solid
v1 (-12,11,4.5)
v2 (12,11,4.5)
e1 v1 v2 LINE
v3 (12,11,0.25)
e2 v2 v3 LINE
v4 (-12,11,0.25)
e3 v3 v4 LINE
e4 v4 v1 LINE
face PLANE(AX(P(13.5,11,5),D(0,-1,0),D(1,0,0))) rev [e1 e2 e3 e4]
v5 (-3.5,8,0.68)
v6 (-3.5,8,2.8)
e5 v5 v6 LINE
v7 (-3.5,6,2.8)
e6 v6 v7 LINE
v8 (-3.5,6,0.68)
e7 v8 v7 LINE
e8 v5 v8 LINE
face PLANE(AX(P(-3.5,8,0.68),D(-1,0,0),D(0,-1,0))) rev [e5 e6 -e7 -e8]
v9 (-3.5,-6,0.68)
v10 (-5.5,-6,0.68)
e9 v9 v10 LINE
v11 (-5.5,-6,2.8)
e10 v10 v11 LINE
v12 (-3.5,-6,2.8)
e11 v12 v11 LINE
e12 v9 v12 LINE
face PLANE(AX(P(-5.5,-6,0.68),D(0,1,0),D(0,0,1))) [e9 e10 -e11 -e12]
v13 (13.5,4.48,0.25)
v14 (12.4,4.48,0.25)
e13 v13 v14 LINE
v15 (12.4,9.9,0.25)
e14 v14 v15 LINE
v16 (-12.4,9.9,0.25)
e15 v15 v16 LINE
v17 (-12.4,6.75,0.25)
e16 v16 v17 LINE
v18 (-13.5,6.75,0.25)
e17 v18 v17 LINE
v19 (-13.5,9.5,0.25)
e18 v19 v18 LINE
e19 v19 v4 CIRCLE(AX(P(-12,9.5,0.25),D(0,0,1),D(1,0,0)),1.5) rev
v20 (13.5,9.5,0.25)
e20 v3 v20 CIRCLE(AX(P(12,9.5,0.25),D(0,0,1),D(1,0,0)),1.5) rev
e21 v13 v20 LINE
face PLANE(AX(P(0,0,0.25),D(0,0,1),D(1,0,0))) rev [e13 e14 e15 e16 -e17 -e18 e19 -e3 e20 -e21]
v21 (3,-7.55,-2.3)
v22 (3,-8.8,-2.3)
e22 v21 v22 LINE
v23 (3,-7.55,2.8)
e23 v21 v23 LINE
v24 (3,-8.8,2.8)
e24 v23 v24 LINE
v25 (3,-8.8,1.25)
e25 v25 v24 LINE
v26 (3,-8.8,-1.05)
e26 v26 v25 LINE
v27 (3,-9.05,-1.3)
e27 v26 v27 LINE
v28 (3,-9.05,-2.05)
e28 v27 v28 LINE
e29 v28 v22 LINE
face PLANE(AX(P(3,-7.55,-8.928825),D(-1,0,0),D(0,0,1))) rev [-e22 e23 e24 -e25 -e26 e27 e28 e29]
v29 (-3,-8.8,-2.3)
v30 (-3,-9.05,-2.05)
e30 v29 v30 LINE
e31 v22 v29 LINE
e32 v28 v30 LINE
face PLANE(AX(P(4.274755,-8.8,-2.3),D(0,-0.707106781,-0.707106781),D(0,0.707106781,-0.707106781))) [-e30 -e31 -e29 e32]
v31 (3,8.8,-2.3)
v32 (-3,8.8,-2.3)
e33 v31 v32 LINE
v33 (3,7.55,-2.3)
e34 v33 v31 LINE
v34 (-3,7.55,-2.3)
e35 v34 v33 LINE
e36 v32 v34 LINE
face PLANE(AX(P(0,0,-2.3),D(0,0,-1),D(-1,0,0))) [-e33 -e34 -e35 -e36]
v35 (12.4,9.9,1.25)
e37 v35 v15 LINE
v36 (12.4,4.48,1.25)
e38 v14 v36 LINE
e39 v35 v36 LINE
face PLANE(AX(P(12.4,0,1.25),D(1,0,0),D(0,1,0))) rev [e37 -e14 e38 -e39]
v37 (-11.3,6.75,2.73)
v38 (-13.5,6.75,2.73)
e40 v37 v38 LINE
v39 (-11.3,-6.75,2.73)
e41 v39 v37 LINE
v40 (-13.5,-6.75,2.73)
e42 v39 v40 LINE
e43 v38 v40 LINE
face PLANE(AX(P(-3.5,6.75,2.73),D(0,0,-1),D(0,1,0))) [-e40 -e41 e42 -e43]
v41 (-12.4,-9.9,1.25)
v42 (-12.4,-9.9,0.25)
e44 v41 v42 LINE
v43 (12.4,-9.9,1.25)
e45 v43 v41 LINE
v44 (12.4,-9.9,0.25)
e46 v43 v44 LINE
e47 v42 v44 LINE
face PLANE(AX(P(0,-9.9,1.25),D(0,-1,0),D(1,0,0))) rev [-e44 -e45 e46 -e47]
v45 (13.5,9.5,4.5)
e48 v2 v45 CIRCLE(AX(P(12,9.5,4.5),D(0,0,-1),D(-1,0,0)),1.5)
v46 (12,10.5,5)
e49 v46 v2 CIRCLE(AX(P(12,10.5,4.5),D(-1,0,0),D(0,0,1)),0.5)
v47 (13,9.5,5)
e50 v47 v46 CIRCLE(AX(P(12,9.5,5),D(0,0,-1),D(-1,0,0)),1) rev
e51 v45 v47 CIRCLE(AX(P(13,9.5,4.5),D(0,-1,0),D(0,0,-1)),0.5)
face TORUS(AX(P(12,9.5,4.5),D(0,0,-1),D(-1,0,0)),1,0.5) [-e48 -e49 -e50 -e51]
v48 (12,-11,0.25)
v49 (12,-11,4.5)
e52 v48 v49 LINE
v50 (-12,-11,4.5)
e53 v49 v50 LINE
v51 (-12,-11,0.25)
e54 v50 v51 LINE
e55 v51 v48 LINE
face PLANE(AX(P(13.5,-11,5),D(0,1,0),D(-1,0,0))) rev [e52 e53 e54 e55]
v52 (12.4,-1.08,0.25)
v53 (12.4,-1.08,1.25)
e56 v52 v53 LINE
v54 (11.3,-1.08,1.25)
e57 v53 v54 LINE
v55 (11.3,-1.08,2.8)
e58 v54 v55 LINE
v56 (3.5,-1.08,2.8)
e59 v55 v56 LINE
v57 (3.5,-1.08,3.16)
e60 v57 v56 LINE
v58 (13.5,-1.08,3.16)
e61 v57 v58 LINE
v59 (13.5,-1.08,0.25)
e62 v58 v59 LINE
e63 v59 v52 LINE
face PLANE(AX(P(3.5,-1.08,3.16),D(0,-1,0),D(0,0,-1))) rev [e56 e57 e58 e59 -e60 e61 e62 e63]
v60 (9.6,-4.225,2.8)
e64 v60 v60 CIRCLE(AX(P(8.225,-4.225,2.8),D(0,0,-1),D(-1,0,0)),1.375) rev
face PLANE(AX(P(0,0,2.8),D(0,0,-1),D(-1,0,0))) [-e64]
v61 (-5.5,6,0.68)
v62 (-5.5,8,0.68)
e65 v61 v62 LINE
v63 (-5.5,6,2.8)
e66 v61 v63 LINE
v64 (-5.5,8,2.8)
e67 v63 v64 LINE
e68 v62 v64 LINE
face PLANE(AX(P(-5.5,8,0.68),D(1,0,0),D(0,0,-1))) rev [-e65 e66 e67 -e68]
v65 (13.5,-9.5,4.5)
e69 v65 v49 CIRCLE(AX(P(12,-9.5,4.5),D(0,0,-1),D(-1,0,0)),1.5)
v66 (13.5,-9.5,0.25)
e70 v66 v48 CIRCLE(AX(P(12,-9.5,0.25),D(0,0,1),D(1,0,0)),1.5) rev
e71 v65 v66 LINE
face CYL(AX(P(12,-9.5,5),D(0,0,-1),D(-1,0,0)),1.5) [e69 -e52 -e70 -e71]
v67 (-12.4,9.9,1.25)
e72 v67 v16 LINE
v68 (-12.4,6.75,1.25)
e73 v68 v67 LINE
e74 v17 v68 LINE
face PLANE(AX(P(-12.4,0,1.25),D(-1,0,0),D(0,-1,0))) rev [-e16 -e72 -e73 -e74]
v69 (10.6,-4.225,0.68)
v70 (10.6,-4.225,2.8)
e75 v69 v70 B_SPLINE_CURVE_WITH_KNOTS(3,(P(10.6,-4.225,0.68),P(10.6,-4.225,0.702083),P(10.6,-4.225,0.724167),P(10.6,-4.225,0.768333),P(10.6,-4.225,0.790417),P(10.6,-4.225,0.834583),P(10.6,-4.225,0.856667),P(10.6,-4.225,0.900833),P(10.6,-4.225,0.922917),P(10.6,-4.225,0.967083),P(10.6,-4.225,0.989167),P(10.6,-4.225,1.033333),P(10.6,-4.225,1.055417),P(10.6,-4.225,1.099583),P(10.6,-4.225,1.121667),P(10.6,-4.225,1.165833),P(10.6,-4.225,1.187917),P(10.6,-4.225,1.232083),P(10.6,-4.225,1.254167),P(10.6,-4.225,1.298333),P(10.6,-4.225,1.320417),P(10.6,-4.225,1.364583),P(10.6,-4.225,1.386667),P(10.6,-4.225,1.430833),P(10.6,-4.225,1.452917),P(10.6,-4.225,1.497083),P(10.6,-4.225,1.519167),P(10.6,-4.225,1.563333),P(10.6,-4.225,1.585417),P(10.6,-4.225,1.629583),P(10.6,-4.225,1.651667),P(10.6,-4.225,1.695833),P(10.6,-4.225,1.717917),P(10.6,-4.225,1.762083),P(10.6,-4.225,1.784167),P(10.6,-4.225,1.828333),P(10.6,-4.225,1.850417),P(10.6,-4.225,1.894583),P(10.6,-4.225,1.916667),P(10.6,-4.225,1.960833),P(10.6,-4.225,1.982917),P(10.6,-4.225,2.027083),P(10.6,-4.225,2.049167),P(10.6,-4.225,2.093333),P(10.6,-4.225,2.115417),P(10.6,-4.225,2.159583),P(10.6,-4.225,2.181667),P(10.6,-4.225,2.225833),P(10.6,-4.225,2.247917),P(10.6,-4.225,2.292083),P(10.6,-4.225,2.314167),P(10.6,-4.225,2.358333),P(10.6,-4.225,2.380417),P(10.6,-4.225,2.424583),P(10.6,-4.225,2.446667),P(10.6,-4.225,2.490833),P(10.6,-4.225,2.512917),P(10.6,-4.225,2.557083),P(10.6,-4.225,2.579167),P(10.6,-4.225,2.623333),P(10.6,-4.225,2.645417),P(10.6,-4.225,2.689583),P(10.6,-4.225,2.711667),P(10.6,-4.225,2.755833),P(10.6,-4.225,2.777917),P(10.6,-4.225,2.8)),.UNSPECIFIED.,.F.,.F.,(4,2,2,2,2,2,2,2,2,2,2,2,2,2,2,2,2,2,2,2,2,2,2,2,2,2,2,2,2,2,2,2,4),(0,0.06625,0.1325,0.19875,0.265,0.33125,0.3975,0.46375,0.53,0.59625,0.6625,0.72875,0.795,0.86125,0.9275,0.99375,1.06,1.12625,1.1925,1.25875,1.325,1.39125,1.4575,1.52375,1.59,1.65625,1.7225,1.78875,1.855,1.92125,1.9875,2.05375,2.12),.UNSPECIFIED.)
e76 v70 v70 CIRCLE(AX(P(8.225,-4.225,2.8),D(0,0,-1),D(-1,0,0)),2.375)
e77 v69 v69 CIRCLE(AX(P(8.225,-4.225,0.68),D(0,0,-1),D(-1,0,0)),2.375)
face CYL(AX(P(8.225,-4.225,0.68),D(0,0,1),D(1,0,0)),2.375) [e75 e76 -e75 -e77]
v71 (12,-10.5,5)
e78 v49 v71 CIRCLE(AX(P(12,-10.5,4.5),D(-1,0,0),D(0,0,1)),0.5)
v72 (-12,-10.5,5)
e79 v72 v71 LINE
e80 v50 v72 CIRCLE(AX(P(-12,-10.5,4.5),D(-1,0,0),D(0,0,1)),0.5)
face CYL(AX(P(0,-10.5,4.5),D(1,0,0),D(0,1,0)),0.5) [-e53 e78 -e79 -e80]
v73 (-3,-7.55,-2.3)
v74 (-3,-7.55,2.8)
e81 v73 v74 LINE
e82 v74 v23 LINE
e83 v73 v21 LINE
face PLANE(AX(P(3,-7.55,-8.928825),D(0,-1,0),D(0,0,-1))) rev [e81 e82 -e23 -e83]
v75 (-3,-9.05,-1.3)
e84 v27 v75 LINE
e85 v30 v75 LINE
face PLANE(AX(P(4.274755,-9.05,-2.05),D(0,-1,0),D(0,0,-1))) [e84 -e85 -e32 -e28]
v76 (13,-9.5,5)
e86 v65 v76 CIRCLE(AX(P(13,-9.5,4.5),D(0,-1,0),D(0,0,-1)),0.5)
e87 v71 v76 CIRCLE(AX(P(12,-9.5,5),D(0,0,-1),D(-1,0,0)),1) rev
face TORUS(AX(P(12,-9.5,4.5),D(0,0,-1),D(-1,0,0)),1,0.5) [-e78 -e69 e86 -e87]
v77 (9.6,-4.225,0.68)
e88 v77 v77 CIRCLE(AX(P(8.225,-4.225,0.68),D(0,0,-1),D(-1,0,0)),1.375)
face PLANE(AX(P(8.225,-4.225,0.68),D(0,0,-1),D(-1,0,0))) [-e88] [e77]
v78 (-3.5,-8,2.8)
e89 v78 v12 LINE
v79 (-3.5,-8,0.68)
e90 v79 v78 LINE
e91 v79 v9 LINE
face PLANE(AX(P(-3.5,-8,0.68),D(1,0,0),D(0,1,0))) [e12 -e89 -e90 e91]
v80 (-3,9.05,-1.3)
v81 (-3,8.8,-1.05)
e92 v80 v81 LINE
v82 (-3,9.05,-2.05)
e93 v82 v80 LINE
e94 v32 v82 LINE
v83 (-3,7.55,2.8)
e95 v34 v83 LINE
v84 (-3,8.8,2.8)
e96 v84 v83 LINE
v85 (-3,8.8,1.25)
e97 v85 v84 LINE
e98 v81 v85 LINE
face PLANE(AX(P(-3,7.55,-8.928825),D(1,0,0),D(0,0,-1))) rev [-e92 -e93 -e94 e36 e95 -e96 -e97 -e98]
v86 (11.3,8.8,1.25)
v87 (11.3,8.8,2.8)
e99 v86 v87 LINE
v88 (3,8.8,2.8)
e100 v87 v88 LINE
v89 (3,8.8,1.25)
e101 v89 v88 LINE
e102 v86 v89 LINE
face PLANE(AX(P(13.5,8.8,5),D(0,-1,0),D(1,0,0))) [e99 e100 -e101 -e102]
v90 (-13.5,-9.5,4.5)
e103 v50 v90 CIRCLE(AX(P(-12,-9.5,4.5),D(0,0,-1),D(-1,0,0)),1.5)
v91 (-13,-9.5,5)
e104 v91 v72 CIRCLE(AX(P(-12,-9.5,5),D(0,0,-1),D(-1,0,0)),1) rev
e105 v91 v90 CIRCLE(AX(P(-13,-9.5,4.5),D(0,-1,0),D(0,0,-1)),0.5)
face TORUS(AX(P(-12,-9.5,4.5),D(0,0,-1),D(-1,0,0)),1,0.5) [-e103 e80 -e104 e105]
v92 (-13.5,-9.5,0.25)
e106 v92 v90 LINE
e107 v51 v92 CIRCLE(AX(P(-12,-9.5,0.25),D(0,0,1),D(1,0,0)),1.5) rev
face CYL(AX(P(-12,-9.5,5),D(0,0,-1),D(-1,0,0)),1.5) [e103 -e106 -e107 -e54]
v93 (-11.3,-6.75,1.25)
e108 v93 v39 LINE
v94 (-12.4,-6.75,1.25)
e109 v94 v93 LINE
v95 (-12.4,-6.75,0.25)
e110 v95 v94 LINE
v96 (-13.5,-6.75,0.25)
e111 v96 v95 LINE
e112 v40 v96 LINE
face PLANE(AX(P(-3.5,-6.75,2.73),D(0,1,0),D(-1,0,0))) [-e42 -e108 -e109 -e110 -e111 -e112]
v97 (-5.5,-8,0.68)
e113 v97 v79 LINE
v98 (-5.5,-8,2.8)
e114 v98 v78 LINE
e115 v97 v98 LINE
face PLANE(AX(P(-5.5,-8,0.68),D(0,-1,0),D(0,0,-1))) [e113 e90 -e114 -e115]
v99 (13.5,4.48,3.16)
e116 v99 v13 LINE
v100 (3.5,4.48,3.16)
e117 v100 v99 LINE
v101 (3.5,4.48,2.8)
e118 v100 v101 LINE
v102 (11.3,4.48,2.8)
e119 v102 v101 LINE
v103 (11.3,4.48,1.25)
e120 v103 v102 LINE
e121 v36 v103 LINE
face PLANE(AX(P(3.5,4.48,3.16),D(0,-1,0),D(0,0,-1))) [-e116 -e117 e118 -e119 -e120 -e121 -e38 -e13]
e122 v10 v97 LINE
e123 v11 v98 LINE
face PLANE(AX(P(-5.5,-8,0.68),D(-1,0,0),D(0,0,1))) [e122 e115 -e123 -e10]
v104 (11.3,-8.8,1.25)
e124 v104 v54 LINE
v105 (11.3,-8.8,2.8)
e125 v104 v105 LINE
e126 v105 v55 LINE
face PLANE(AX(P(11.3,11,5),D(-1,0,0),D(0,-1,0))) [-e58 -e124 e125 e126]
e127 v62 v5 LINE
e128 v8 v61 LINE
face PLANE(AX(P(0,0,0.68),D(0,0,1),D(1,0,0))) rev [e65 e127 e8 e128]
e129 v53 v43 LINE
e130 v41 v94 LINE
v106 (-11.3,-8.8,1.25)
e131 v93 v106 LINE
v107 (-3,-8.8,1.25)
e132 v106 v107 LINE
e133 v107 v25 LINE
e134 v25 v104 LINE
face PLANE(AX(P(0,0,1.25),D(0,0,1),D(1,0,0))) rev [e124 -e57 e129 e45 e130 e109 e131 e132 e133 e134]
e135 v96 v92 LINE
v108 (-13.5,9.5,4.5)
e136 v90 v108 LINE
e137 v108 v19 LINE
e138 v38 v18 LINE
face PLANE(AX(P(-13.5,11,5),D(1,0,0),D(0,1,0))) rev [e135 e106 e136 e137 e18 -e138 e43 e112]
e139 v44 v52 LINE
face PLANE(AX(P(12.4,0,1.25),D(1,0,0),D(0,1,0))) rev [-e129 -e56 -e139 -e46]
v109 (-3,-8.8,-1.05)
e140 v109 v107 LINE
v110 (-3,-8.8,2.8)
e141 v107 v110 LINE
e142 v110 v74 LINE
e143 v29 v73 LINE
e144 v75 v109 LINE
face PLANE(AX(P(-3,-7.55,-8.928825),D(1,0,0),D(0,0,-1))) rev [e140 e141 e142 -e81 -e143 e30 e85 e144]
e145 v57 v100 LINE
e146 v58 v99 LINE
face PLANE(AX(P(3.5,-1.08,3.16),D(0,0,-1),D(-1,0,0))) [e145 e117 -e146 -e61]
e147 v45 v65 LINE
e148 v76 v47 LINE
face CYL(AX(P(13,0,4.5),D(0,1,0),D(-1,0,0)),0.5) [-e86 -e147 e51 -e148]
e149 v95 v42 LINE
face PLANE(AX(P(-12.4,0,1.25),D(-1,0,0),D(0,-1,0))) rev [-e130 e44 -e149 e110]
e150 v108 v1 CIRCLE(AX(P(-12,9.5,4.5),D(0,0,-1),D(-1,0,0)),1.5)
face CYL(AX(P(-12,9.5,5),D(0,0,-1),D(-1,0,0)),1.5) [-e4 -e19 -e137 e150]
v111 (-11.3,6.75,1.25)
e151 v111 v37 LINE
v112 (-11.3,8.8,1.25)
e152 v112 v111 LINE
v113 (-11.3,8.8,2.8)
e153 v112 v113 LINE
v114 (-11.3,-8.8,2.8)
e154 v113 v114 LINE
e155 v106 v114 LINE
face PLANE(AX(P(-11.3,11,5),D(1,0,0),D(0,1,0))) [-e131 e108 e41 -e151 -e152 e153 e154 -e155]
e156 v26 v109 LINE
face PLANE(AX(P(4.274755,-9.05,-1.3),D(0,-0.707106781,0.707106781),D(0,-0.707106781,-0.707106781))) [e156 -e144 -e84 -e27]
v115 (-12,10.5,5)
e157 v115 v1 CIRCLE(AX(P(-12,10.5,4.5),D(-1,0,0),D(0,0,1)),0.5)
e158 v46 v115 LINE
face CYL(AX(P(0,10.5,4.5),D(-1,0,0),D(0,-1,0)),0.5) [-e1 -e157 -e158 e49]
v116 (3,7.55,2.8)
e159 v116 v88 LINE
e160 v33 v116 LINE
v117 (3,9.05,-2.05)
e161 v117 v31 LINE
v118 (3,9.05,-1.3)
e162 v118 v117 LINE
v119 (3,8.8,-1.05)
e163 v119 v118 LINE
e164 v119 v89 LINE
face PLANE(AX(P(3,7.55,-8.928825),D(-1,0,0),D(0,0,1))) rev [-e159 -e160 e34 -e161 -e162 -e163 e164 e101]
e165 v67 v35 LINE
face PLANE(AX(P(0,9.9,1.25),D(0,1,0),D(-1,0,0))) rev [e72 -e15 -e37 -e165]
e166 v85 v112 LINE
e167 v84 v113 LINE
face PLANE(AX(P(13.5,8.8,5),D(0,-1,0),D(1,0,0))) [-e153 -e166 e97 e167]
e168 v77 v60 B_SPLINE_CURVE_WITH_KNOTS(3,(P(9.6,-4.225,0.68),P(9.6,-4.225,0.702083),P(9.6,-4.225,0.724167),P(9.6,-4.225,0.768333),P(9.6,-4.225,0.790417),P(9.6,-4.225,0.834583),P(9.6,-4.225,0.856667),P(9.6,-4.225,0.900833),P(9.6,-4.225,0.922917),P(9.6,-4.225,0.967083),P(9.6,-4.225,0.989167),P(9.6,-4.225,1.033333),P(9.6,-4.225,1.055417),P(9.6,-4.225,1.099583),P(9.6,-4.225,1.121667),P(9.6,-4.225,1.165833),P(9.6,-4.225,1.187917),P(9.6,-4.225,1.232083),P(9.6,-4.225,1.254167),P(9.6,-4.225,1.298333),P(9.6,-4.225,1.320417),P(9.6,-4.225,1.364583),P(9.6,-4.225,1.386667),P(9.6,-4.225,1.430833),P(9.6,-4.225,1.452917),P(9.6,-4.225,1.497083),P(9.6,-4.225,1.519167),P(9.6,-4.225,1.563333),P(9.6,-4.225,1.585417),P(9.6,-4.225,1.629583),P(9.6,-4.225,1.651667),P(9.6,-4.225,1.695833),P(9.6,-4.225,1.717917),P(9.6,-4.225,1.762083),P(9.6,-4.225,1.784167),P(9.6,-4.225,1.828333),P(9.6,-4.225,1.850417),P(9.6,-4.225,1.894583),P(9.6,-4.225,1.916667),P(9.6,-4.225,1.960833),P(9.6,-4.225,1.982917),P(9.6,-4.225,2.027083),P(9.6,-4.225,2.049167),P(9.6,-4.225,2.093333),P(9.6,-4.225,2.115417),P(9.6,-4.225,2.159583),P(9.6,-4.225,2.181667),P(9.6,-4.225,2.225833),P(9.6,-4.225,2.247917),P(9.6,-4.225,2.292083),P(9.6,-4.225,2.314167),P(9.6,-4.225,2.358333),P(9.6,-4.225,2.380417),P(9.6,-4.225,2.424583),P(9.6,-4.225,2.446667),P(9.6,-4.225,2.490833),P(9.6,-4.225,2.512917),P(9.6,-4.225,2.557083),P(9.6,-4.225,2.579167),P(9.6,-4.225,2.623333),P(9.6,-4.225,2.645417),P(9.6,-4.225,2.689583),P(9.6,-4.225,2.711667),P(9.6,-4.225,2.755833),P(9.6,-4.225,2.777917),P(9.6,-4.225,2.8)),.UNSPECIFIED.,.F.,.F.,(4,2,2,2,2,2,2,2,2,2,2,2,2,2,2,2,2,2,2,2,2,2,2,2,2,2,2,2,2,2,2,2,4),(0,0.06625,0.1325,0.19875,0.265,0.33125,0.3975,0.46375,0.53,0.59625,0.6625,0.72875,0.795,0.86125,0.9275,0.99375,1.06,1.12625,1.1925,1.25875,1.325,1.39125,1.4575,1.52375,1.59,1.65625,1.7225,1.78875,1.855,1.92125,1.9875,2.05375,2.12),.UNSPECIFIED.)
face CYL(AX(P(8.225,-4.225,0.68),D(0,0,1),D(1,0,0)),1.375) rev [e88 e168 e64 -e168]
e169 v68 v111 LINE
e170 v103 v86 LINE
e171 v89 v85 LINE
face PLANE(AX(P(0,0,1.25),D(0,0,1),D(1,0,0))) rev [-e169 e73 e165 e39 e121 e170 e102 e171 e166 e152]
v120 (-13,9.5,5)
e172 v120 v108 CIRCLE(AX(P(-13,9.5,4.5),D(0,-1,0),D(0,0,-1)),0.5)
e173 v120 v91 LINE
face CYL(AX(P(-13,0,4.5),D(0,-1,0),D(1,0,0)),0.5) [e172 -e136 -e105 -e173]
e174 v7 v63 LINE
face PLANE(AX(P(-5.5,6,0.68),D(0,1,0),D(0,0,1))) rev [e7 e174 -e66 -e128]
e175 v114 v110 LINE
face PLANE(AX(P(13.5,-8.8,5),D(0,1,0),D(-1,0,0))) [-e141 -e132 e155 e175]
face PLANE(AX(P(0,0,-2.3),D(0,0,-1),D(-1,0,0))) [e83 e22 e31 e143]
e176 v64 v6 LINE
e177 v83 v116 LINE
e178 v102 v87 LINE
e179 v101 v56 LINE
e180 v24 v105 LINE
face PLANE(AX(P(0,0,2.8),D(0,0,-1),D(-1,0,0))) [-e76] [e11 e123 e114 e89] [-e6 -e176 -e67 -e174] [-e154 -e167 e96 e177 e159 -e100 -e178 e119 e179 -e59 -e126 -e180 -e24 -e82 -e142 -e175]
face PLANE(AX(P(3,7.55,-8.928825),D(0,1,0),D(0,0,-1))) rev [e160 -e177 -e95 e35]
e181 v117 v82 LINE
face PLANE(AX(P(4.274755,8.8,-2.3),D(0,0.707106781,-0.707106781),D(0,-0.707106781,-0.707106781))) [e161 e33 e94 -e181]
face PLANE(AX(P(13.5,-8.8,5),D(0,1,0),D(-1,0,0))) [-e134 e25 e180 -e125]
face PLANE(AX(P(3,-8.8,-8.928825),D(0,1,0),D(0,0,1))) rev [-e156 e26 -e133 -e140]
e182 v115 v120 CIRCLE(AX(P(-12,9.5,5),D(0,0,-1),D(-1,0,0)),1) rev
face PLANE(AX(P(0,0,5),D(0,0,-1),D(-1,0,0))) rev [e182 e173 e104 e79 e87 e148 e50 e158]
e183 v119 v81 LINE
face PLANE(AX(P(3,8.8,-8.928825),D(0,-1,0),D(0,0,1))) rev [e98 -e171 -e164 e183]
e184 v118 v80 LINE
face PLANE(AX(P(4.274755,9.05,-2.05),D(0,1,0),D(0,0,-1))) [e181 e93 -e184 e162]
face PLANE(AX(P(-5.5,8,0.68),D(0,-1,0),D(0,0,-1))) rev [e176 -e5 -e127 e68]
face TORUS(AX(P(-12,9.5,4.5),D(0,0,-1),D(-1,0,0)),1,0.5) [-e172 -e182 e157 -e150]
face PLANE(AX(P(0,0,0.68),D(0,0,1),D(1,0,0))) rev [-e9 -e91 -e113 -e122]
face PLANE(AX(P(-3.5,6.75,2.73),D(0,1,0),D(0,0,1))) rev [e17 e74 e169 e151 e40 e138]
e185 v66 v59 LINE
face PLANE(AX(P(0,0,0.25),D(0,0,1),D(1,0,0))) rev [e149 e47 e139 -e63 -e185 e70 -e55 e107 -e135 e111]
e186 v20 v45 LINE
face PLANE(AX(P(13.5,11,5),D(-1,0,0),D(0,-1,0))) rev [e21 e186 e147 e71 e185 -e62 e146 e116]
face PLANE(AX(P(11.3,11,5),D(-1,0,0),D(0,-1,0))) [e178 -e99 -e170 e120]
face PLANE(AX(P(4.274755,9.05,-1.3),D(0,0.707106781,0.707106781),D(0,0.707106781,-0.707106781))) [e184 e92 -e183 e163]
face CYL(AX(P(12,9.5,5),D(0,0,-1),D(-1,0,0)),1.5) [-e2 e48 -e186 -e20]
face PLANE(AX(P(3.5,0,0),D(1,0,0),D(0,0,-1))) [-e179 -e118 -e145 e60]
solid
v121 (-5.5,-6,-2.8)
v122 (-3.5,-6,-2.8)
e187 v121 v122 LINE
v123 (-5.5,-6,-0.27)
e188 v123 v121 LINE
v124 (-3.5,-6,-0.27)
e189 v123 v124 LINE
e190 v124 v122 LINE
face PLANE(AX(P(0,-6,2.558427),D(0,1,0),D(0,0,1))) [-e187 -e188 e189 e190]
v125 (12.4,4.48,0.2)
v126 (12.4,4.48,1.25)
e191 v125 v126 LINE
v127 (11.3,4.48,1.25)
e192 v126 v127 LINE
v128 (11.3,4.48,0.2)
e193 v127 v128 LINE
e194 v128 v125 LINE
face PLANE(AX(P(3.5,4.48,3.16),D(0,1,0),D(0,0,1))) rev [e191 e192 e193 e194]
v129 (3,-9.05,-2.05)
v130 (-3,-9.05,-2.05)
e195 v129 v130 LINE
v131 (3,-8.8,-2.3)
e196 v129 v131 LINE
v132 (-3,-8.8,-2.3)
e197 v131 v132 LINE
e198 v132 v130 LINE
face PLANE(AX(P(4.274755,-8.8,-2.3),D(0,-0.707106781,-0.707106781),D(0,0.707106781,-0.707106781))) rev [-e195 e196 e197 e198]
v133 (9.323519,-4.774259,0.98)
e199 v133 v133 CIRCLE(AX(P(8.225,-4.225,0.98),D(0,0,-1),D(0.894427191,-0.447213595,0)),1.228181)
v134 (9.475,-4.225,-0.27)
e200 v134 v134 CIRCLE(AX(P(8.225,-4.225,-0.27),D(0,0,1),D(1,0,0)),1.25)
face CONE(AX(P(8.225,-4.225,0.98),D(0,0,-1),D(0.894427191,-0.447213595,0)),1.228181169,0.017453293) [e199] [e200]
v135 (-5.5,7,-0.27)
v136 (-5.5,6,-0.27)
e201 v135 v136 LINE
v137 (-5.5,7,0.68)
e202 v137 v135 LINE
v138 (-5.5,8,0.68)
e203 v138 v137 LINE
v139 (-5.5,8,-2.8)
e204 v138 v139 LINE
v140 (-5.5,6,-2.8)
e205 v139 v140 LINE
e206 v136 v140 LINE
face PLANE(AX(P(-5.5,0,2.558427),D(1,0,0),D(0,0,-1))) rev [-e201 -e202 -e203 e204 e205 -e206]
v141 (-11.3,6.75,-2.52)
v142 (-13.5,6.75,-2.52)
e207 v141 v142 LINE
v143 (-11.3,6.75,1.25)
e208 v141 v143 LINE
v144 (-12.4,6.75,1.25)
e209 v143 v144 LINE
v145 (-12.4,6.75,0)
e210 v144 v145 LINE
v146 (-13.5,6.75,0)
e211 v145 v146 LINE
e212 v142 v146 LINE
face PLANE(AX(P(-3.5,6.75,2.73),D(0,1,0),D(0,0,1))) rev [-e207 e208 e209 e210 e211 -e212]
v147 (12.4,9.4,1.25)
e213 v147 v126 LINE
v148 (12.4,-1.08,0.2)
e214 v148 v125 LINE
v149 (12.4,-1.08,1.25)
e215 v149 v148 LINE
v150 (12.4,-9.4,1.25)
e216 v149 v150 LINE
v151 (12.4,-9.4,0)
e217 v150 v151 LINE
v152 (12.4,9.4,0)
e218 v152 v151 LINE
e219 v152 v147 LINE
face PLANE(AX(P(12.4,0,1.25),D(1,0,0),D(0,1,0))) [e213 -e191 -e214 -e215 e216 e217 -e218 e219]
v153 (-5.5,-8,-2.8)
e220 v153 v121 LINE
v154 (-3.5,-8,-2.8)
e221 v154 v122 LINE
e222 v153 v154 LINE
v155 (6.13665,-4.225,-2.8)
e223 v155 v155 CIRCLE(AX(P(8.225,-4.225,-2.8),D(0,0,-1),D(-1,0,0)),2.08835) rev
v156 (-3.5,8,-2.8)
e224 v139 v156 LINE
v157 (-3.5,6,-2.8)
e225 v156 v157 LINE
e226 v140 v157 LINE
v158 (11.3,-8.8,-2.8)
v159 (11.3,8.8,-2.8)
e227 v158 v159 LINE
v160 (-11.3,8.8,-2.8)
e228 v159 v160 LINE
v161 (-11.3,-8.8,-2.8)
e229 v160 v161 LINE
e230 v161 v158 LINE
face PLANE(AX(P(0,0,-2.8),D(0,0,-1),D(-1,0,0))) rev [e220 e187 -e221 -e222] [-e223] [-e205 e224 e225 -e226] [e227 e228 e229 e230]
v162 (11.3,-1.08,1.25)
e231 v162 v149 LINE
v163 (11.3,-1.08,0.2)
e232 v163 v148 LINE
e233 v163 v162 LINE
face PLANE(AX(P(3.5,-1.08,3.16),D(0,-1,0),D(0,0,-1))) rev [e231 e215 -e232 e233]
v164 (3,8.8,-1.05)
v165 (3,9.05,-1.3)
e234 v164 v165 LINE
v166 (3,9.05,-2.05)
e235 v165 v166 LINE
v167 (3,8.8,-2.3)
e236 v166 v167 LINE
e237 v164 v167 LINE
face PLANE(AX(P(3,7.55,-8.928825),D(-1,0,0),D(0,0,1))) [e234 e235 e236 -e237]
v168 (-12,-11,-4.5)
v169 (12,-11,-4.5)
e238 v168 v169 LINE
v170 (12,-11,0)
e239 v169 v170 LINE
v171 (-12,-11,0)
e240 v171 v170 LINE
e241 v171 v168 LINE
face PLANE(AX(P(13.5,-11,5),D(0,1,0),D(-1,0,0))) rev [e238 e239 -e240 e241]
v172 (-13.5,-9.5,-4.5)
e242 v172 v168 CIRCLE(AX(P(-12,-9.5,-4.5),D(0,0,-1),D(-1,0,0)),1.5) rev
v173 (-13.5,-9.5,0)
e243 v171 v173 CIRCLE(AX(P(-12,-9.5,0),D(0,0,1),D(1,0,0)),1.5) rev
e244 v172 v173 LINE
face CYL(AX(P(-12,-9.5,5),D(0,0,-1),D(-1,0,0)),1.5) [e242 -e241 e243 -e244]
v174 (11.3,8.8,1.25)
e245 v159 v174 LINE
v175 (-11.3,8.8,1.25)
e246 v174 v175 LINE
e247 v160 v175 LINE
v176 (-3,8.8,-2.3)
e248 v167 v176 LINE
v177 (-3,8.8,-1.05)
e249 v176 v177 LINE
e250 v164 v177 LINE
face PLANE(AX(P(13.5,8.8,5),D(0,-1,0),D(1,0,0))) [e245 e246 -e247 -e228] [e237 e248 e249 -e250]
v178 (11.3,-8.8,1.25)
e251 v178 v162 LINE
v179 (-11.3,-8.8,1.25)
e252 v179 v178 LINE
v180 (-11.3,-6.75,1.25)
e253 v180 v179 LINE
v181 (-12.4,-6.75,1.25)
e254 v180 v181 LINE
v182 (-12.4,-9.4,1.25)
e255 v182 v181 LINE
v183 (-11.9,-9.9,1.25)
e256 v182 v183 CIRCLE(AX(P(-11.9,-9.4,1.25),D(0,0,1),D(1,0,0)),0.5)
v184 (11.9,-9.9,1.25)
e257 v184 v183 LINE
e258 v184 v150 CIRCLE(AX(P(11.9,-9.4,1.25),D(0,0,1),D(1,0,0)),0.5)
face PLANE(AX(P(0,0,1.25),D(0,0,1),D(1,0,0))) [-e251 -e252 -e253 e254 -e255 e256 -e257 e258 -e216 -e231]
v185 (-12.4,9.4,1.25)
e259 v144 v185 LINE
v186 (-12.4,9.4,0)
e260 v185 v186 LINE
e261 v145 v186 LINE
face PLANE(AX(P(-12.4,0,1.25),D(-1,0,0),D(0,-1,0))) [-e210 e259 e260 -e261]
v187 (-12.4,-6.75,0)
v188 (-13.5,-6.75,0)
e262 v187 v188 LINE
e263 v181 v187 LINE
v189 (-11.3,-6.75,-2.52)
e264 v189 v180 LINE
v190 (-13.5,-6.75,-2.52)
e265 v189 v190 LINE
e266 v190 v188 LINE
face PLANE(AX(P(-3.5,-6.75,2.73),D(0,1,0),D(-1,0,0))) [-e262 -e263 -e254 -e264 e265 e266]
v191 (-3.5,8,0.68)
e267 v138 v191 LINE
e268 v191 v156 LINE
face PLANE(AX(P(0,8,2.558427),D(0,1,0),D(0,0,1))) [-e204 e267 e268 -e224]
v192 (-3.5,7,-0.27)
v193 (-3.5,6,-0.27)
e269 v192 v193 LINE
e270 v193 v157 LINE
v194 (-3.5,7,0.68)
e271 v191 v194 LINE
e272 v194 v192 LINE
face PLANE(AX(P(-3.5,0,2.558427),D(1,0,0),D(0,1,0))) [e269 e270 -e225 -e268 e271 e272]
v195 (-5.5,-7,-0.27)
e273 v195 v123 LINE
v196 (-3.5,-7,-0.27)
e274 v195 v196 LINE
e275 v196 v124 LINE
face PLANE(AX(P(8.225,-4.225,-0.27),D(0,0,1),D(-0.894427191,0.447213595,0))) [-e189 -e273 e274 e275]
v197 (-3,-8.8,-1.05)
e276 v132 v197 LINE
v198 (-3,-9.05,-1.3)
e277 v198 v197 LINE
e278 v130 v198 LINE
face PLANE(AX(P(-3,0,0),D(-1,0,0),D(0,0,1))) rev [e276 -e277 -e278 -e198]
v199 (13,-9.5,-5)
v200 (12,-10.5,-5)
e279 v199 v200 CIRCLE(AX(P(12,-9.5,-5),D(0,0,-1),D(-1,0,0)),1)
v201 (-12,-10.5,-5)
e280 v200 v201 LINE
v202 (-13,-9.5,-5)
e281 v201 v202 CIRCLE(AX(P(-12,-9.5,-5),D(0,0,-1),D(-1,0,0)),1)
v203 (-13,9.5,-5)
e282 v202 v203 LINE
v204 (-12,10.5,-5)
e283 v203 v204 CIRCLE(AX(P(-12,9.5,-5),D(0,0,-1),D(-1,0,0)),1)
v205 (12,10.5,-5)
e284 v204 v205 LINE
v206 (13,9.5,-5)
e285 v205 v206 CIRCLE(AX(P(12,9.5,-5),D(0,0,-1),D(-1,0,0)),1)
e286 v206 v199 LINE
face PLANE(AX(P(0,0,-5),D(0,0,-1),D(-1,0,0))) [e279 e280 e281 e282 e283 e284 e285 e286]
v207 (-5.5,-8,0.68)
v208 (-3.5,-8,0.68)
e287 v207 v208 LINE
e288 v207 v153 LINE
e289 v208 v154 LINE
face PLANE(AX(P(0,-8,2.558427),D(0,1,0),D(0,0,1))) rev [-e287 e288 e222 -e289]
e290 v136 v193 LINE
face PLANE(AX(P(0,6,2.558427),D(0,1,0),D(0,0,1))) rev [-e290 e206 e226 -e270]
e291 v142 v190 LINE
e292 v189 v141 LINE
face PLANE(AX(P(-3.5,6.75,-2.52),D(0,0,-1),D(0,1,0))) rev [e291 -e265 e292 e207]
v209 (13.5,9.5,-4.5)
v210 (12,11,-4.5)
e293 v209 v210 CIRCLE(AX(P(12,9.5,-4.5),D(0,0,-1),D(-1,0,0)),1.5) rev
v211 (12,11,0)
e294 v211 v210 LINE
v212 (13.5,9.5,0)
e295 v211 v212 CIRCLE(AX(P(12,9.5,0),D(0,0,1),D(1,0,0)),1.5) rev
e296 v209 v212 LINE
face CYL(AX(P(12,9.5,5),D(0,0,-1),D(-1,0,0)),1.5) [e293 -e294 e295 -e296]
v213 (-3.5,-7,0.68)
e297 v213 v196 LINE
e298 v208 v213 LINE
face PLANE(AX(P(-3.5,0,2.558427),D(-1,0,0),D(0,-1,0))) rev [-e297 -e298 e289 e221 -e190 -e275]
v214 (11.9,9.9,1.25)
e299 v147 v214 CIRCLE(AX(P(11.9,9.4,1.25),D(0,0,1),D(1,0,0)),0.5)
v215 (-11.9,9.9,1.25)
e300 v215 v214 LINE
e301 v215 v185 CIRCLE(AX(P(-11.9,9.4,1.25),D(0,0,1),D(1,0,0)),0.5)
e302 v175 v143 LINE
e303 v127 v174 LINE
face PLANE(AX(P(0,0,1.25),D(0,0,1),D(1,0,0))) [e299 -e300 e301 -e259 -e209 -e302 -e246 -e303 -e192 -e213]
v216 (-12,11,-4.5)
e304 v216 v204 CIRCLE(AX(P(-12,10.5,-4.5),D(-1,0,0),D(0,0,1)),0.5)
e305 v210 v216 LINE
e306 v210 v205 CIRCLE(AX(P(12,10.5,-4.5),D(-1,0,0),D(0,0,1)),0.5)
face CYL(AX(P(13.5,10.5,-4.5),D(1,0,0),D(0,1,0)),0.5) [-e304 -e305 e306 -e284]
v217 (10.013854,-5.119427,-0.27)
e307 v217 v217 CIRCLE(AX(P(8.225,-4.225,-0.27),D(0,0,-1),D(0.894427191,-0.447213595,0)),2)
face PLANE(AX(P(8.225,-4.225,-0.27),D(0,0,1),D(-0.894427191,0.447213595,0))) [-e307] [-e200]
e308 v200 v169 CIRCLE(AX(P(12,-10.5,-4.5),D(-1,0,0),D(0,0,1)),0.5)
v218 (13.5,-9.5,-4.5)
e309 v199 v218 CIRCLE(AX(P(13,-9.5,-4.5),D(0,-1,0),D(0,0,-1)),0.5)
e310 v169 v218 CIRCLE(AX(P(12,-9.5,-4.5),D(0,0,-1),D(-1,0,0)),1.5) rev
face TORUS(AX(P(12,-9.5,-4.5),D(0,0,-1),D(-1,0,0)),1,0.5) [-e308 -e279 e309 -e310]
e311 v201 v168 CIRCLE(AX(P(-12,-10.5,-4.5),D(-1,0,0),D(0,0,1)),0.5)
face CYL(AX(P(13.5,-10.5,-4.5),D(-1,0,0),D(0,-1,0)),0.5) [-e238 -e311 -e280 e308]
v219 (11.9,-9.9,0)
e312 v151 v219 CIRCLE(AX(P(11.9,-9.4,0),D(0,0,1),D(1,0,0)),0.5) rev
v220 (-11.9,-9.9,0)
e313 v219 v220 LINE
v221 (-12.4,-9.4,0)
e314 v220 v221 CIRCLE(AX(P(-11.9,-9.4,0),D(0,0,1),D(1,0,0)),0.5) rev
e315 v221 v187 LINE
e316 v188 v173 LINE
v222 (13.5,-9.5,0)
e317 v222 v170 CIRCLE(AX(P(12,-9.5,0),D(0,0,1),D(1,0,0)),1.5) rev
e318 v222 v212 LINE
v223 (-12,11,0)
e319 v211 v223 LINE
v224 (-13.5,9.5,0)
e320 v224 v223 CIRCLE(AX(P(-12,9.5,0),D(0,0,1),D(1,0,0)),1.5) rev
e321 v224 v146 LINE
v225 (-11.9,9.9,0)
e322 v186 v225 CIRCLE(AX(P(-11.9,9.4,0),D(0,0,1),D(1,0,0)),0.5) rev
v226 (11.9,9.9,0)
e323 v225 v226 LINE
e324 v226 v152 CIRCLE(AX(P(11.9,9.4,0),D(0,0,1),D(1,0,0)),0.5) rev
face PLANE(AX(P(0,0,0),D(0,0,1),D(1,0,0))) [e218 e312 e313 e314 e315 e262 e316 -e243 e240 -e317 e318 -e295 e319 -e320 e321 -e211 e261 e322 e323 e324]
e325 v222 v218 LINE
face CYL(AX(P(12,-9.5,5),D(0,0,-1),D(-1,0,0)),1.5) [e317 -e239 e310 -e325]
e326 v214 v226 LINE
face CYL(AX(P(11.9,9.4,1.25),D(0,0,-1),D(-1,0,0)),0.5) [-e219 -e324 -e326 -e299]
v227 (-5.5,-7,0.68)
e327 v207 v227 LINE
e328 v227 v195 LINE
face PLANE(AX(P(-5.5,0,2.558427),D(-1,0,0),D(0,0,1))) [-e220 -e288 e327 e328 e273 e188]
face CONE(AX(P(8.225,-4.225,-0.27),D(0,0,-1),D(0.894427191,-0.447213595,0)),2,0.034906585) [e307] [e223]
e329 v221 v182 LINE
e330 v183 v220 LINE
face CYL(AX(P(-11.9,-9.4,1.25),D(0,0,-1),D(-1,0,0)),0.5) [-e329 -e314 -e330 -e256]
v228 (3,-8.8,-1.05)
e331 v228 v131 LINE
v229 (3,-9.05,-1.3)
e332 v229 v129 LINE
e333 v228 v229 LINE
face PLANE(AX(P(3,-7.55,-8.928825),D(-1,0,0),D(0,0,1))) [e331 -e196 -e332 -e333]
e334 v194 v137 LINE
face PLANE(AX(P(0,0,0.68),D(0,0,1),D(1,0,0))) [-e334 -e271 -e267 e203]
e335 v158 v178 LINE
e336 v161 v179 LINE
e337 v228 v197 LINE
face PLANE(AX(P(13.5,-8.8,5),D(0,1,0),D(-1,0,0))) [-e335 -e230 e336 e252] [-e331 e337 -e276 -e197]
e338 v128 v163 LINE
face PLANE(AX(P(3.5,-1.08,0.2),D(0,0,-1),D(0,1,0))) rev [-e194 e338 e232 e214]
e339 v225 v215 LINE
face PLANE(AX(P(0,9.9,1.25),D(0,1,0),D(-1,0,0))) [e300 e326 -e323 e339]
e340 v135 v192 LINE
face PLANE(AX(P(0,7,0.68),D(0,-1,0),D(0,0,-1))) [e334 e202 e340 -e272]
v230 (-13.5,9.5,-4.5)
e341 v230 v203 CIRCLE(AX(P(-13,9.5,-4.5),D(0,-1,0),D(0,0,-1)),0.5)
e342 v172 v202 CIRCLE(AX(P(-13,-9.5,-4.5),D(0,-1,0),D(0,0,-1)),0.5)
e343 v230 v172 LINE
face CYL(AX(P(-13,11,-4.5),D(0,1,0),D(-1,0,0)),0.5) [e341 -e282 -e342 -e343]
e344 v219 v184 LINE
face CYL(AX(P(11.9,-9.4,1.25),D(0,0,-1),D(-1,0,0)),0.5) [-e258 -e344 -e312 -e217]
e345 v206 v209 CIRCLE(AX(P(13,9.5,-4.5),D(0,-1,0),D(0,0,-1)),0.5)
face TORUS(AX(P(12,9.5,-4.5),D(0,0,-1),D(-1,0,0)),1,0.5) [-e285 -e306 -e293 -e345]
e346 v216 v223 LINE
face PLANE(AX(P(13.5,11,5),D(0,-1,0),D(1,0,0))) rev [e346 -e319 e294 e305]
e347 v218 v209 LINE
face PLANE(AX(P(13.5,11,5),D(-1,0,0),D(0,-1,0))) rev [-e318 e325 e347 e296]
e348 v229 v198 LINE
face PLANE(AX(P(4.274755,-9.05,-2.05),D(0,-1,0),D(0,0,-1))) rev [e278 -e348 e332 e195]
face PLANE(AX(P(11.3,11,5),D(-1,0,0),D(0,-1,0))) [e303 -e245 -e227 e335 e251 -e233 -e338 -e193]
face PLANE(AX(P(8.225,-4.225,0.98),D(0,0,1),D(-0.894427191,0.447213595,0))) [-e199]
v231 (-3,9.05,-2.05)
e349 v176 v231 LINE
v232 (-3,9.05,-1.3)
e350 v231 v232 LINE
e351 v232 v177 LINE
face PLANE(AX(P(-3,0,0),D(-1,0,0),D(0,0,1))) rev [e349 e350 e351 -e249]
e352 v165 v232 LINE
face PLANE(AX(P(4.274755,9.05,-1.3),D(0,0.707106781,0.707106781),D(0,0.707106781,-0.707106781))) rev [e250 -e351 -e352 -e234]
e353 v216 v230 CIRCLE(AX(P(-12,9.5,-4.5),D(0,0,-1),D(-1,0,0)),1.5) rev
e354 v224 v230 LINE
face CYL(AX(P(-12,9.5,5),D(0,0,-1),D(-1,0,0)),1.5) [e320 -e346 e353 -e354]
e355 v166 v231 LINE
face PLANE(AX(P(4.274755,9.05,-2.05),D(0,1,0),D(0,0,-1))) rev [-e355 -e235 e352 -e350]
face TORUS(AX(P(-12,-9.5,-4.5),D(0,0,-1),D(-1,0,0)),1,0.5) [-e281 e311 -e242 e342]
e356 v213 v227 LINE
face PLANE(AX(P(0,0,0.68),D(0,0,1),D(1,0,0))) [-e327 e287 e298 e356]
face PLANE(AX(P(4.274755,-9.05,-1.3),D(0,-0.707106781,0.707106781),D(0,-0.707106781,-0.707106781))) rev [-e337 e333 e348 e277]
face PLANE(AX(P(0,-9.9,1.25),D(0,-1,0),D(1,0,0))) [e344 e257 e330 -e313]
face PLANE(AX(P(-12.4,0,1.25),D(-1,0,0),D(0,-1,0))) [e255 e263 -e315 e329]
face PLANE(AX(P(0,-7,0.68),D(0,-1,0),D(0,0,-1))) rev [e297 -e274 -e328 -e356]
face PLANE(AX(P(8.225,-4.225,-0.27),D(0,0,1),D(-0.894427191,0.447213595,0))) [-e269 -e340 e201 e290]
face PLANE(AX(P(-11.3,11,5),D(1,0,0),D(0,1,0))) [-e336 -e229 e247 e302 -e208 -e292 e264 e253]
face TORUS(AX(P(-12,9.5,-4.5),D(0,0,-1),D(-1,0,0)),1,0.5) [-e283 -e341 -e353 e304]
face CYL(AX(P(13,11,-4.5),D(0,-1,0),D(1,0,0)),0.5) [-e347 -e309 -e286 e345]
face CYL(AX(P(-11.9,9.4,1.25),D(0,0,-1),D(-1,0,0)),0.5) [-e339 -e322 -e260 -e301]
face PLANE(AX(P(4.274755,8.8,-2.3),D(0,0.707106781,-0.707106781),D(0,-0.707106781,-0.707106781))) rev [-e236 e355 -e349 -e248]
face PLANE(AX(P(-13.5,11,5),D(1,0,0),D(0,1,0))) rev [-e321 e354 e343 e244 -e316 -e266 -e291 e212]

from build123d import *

# Parameters (mm, degrees)
SKETCH1_W                   = 27
SKETCH1_H                   = 22
BOSS_EXTRUDE1_DEPTH         = 5
FILLET1_R                   = 1.5
SHELL1_T                    = 2.2
SKETCH4_W                   = 5.25
SKETCH4_H                   = 13.5
CUT_EXTRUDE1_DEPTH          = 10
SKETCH3_W                   = 2.96
SKETCH3_H                   = 5.56
CUT_EXTRUDE2_DEPTH          = 10
FILLET2_R                   = 0.5
FILLET3_R                   = 0.5
SKETCH5_W                   = 2
SKETCH5_H                   = 1
BOSS_EXTRUDE2_DEPTH         = 2.53
SKETCH5_3_W                 = 2
SKETCH5_3_H                 = 1
BOSS_EXTRUDE3_DEPTH         = 3.48
SKETCH6_W                   = 2
SKETCH6_H                   = 2
BOSS_EXTRUDE4_DEPTH         = 2.12
LIP_GROOVE2_GROOVE_DEPTH    = 1.25
LIP_GROOVE2_GROOVE_2_DEPTH  = 0.25
LIP_GROOVE2_LIP_START       = -9.9
LIP_GROOVE2_LIP_OUTLINE_W   = 24.8
LIP_GROOVE2_LIP_OUTLINE_H   = 1.25
LIP_GROOVE2_LIP_DEPTH       = 1.1
LIP_GROOVE2_LIP_START_2     = 8.8
LIP_GROOVE2_LIP_2_OUTLINE_W = 24.8
LIP_GROOVE2_LIP_2_OUTLINE_H = 1.25
LIP_GROOVE2_LIP_2_DEPTH     = 1.1
LIP_GROOVE2_LIP_START_3     = -8.8
LIP_GROOVE2_LIP_3_OUTLINE_W = 1.1
LIP_GROOVE2_LIP_3_OUTLINE_H = 1.25
LIP_GROOVE2_LIP_3_DEPTH     = 17.6
LIP_GROOVE2_LIP_4_OUTLINE_W = 1.1
LIP_GROOVE2_LIP_4_OUTLINE_H = 1.25
LIP_GROOVE2_LIP_4_DEPTH     = 2.05
LIP_GROOVE2_LIP_START_4     = 6.75
LIP_GROOVE2_LIP_5_OUTLINE_W = 1.1
LIP_GROOVE2_LIP_5_OUTLINE_H = 1.25
LIP_GROOVE2_LIP_5_DEPTH     = 2.05
SKETCH11_W                  = 6
SKETCH11_H                  = 1.25
BOSS_EXTRUDE5_DEPTH         = 5.1
BOSS_EXTRUDE6_DEPTH         = 6
CUT_EXTRUDE3_DEPTH          = 6
FILLET4_R                   = 0.5
SKETCH3_3_W                 = 2.96
SKETCH3_3_H                 = 5.56
CUT_EXTRUDE4_DEPTH          = 10
SKETCH14_R                  = 2.375
SKETCH14_R_2                = 1.375
BOSS_EXTRUDE7_DEPTH         = 2.12


with BuildPart() as part:
    # Sketch1 → Boss-Extrude1 (new, symmetric)
    with BuildSketch(Plane.XY):
        Rectangle(SKETCH1_W, SKETCH1_H)
    extrude(amount=BOSS_EXTRUDE1_DEPTH, both=True)

    # Fillet1
    fillet1_edges = [part.edges().sort_by_distance(p)[0] for p in [
        (-13.5, 11, 0),
        (13.5, 11, 0),
        (13.5, -11, 0),
        (-13.5, -11, 0),
    ]]
    fillet(fillet1_edges, radius=FILLET1_R)

    # Shell1 (no face opened: a closed hollow body)
    add(offset(amount=-SHELL1_T, mode=Mode.PRIVATE), mode=Mode.SUBTRACT)


with BuildPart() as body_2:
    # Split1: the piece on the far side of the plane
    add(part.part)
    split(bisect_by=Plane.XY, keep=Keep.BOTTOM)

    # Mounting Boss1: read off the stored shape, not the designer's step
    # Mounting Boss1 outline → Mounting Boss1 (revolve)
    with BuildSketch(Plane(origin=(8.225, -4.225, 0), x_dir=(1, 0, 0), z_dir=(0, -1, 0))):
        Polygon((2, -0.27), (1.25, -0.27), (1.228181169, 0.98), (0, 0.98), (0, -2.8), (2.088349547, -2.8), align=None)
    revolve(axis=Axis((8.225, -4.225, 0), (0, 0, 1)))


with BuildPart() as part_1:
    add(part.part)

    # Split1
    split(bisect_by=Plane.XY, keep=Keep.TOP)


with BuildPart() as cut_extrude1_tool:
    # Sketch4 → Cut-Extrude1 (new body)
    with BuildSketch(Plane.ZY.offset(13.5)):
        with Locations((0.105, 0)):
            Rectangle(SKETCH4_W, SKETCH4_H)
    extrude(amount=-CUT_EXTRUDE1_DEPTH)


with BuildPart() as part_2:
    add(part_1.part)

    # Cut-Extrude1: cut by cut_extrude1_tool
    add(cut_extrude1_tool.part, mode=Mode.SUBTRACT)

    # Sketch3 → Cut-Extrude2 (cut)
    with BuildSketch(Plane(origin=(13.5, 0, 0), x_dir=(0, 0, -1), z_dir=(1, 0, 0))):
        with Locations((-1.68, 1.7)):
            Rectangle(SKETCH3_W, SKETCH3_H)
    extrude(amount=-CUT_EXTRUDE2_DEPTH, mode=Mode.SUBTRACT)

    # Fillet2
    fillet2_edges = [part_2.edges().sort_by_distance(p)[0] for p in [
        (-13.5, 0, 5),
        (0, 11, 5),
        (0, -11, 5),
        (13.5, 0, 5),
        (-13.060660172, -10.560660172, 5),
        (13.060660172, -10.560660172, 5),
        (13.060660172, 10.560660172, 5),
        (-13.060660172, 10.560660172, 5),
    ]]
    fillet(fillet2_edges, radius=FILLET2_R)

    # Sketch6 → Boss-Extrude4 (add)
    with BuildSketch(Plane(origin=(0, 0, 2.8), x_dir=(-1, 0, 0), z_dir=(0, 0, -1))):
        with Locations((4.5, 7)):
            Rectangle(SKETCH6_W, SKETCH6_H)
    boss_extrude4 = extrude(amount=BOSS_EXTRUDE4_DEPTH)

    # Mirror3: Boss-Extrude4 across plane
    add(boss_extrude4.mirror(Plane.ZX))

    # Lip&Groove2-Groove: read off the stored shape, not the designer's step
    # Lip&Groove2-Groove outline → Lip&Groove2-Groove (cut)
    with BuildSketch(Plane.XY):
        Polygon((-12.4, -9.9), (12.4, -9.9), (12.4, -1.08), (13.5, -1.08), (13.5, 4.48), (12.4, 4.48), (12.4, 9.9), (-12.4, 9.9), (-12.4, 6.75), (-11.3, 6.75), (-11.3, 8.8), (11.3, 8.8), (11.3, -8.8), (-11.3, -8.8), (-11.3, -6.75), (-12.4, -6.75), align=None)
    extrude(amount=LIP_GROOVE2_GROOVE_DEPTH, mode=Mode.SUBTRACT)

    # Lip_Groove2-Groove 2 outline → Lip_Groove2-Groove 2 (cut)
    with BuildSketch(Plane.XY):
        with BuildLine():
            Line((12.4, -1.08), (12.4, -9.9))
            Line((12.4, -9.9), (-12.4, -9.9))
            Line((-12.4, -9.9), (-12.4, -6.75))
            Line((-12.4, -6.75), (-13.5, -6.75))
            Line((-13.5, -6.75), (-13.5, -9.5))
            ThreePointArc((-13.5, -9.5), (-13.060660172, -10.560660172), (-12, -11))
            Line((-12, -11), (12, -11))
            ThreePointArc((12, -11), (13.060660172, -10.560660172), (13.5, -9.5))
            Line((13.5, -9.5), (13.5, -1.08))
            Line((13.5, -1.08), (12.4, -1.08))
        make_face()
        with BuildLine():
            Line((12.4, 4.48), (13.5, 4.48))
            Line((13.5, 4.48), (13.5, 9.5))
            ThreePointArc((13.5, 9.5), (13.060660172, 10.560660172), (12, 11))
            Line((12, 11), (-12, 11))
            ThreePointArc((-12, 11), (-13.060660172, 10.560660172), (-13.5, 9.5))
            Line((-13.5, 9.5), (-13.5, 6.75))
            Line((-13.5, 6.75), (-12.4, 6.75))
            Line((-12.4, 6.75), (-12.4, 9.9))
            Line((-12.4, 9.9), (12.4, 9.9))
            Line((12.4, 9.9), (12.4, 4.48))
        make_face()
    extrude(amount=LIP_GROOVE2_GROOVE_2_DEPTH, mode=Mode.SUBTRACT)

    # Sketch11 → Boss-Extrude5 (add)
    with BuildSketch(Plane(origin=(0, 0, 2.8), x_dir=(-1, 0, 0), z_dir=(0, 0, -1))):
        with Locations((0, -8.175)):
            Rectangle(SKETCH11_W, SKETCH11_H)
    boss_extrude5 = extrude(amount=BOSS_EXTRUDE5_DEPTH)

    # Sketch12 → Boss-Extrude6 (add)
    with BuildSketch(Plane.ZY.offset(3)):
        Polygon((-2.3, -8.8), (-2.05, -9.05), (-1.3, -9.05), (-1.05, -8.8), align=None)
    boss_extrude6 = extrude(amount=-BOSS_EXTRUDE6_DEPTH)

    # Mirror5: Boss-Extrude5, Boss-Extrude6 across plane
    add(boss_extrude5.mirror(Plane.ZX))
    add(boss_extrude6.mirror(Plane.ZX))

    # Sketch14 → Boss-Extrude7 (add)
    with BuildSketch(Plane(origin=(0, 0, 2.8), x_dir=(-1, 0, 0), z_dir=(0, 0, -1))):
        with Locations(Location((-8.225, -4.225, 0), (0, 0, 180))):
            Circle(SKETCH14_R)
        with Locations(Location((-8.225, -4.225, 0), (0, 0, 180))):
            Circle(SKETCH14_R_2, mode=Mode.SUBTRACT)
    extrude(amount=BOSS_EXTRUDE7_DEPTH)


with BuildPart() as body_2_1:
    add(body_2.part)

    # Cut-Extrude1: cut by cut_extrude1_tool
    add(cut_extrude1_tool.part, mode=Mode.SUBTRACT)

    # Fillet3
    fillet3_edges = [body_2_1.edges().sort_by_distance(p)[0] for p in [
        (-13.5, 0, -5),
        (0, -11, -5),
        (13.5, 0, -5),
        (0, 11, -5),
        (-13.060660172, -10.560660172, -5),
        (13.060660172, -10.560660172, -5),
        (13.060660172, 10.560660172, -5),
        (-13.060660172, 10.560660172, -5),
    ]]
    fillet(fillet3_edges, radius=FILLET3_R)

    # Sketch5 → Boss-Extrude2 (add)
    with BuildSketch(Plane.XY.offset(-2.8)):
        with Locations((-4.5, 7.5)):
            Rectangle(SKETCH5_W, SKETCH5_H)
        with Locations((-4.5, 6.5)):
            Rectangle(SKETCH5_W, SKETCH5_H)
    boss_extrude2 = extrude(amount=BOSS_EXTRUDE2_DEPTH)

    # Sketch5<3> → Boss-Extrude3 (add)
    with BuildSketch(Plane.XY.offset(-2.8)):
        with Locations((-4.5, 7.5)):
            Rectangle(SKETCH5_3_W, SKETCH5_3_H)
    boss_extrude3 = extrude(amount=BOSS_EXTRUDE3_DEPTH)

    # Mirror2: Boss-Extrude2, Boss-Extrude3 across plane
    add(boss_extrude2.mirror(Plane.ZX))
    add(boss_extrude3.mirror(Plane.ZX))

    # Lip&Groove2-Lip: read off the stored shape, not the designer's step
    # Lip&Groove2-Lip outline → Lip&Groove2-Lip (add)
    with BuildSketch(Plane(origin=(0, 0, 0), x_dir=(1, 0, 0), z_dir=(0, 1, 0)).offset(LIP_GROOVE2_LIP_START)):
        with Locations((0, -0.625)):
            Rectangle(LIP_GROOVE2_LIP_OUTLINE_W, LIP_GROOVE2_LIP_OUTLINE_H)
    extrude(amount=LIP_GROOVE2_LIP_DEPTH)

    # Lip_Groove2-Lip 2 outline → Lip_Groove2-Lip 2 (add)
    with BuildSketch(Plane(origin=(0, 0, 0), x_dir=(1, 0, 0), z_dir=(0, 1, 0)).offset(LIP_GROOVE2_LIP_START_2)):
        with Locations((0, -0.625)):
            Rectangle(LIP_GROOVE2_LIP_2_OUTLINE_W, LIP_GROOVE2_LIP_2_OUTLINE_H)
    extrude(amount=LIP_GROOVE2_LIP_2_DEPTH)

    # Lip_Groove2-Lip 3 outline → Lip_Groove2-Lip 3 (add)
    with BuildSketch(Plane(origin=(0, 0, 0), x_dir=(1, 0, 0), z_dir=(0, 1, 0)).offset(LIP_GROOVE2_LIP_START_3)):
        with Locations((11.85, -0.625)):
            Rectangle(LIP_GROOVE2_LIP_3_OUTLINE_W, LIP_GROOVE2_LIP_3_OUTLINE_H)
    extrude(amount=LIP_GROOVE2_LIP_3_DEPTH)

    # Lip_Groove2-Lip 4 outline → Lip_Groove2-Lip 4 (add)
    with BuildSketch(Plane(origin=(0, 0, 0), x_dir=(1, 0, 0), z_dir=(0, 1, 0)).offset(LIP_GROOVE2_LIP_START_3)):
        with Locations((-11.85, -0.625)):
            Rectangle(LIP_GROOVE2_LIP_4_OUTLINE_W, LIP_GROOVE2_LIP_4_OUTLINE_H)
    extrude(amount=LIP_GROOVE2_LIP_4_DEPTH)

    # Lip_Groove2-Lip 5 outline → Lip_Groove2-Lip 5 (add)
    with BuildSketch(Plane(origin=(0, 0, 0), x_dir=(1, 0, 0), z_dir=(0, 1, 0)).offset(LIP_GROOVE2_LIP_START_4)):
        with Locations((-11.85, -0.625)):
            Rectangle(LIP_GROOVE2_LIP_5_OUTLINE_W, LIP_GROOVE2_LIP_5_OUTLINE_H)
    extrude(amount=LIP_GROOVE2_LIP_5_DEPTH)

    # Sketch12<2> → Cut-Extrude3 (cut)
    with BuildSketch(Plane.ZY.offset(3)):
        Polygon((-2.3, -8.8), (-2.05, -9.05), (-1.3, -9.05), (-1.05, -8.8), align=None)
    cut_extrude3 = extrude(amount=-CUT_EXTRUDE3_DEPTH, mode=Mode.SUBTRACT)

    # Mirror6: Cut-Extrude3 across plane
    add(cut_extrude3.mirror(Plane.ZX), mode=Mode.SUBTRACT)

    # Fillet4
    fillet4_edges = [body_2_1.edges().sort_by_distance(p)[0] for p in [
        (-12.4, -9.9, 0.625),
        (12.4, -9.9, 0.625),
        (12.4, 9.9, 0.625),
        (-12.4, 9.9, 0.625),
    ]]
    fillet(fillet4_edges, radius=FILLET4_R)

    # Sketch3<3> → Cut-Extrude4 (cut)
    with BuildSketch(Plane(origin=(13.5, 0, 0), x_dir=(0, 0, -1), z_dir=(1, 0, 0))):
        with Locations((-1.68, 1.7)):
            Rectangle(SKETCH3_3_W, SKETCH3_3_H)
    extrude(amount=-CUT_EXTRUDE4_DEPTH, mode=Mode.SUBTRACT)


solid = Compound([part_2.part, body_2_1.part])
